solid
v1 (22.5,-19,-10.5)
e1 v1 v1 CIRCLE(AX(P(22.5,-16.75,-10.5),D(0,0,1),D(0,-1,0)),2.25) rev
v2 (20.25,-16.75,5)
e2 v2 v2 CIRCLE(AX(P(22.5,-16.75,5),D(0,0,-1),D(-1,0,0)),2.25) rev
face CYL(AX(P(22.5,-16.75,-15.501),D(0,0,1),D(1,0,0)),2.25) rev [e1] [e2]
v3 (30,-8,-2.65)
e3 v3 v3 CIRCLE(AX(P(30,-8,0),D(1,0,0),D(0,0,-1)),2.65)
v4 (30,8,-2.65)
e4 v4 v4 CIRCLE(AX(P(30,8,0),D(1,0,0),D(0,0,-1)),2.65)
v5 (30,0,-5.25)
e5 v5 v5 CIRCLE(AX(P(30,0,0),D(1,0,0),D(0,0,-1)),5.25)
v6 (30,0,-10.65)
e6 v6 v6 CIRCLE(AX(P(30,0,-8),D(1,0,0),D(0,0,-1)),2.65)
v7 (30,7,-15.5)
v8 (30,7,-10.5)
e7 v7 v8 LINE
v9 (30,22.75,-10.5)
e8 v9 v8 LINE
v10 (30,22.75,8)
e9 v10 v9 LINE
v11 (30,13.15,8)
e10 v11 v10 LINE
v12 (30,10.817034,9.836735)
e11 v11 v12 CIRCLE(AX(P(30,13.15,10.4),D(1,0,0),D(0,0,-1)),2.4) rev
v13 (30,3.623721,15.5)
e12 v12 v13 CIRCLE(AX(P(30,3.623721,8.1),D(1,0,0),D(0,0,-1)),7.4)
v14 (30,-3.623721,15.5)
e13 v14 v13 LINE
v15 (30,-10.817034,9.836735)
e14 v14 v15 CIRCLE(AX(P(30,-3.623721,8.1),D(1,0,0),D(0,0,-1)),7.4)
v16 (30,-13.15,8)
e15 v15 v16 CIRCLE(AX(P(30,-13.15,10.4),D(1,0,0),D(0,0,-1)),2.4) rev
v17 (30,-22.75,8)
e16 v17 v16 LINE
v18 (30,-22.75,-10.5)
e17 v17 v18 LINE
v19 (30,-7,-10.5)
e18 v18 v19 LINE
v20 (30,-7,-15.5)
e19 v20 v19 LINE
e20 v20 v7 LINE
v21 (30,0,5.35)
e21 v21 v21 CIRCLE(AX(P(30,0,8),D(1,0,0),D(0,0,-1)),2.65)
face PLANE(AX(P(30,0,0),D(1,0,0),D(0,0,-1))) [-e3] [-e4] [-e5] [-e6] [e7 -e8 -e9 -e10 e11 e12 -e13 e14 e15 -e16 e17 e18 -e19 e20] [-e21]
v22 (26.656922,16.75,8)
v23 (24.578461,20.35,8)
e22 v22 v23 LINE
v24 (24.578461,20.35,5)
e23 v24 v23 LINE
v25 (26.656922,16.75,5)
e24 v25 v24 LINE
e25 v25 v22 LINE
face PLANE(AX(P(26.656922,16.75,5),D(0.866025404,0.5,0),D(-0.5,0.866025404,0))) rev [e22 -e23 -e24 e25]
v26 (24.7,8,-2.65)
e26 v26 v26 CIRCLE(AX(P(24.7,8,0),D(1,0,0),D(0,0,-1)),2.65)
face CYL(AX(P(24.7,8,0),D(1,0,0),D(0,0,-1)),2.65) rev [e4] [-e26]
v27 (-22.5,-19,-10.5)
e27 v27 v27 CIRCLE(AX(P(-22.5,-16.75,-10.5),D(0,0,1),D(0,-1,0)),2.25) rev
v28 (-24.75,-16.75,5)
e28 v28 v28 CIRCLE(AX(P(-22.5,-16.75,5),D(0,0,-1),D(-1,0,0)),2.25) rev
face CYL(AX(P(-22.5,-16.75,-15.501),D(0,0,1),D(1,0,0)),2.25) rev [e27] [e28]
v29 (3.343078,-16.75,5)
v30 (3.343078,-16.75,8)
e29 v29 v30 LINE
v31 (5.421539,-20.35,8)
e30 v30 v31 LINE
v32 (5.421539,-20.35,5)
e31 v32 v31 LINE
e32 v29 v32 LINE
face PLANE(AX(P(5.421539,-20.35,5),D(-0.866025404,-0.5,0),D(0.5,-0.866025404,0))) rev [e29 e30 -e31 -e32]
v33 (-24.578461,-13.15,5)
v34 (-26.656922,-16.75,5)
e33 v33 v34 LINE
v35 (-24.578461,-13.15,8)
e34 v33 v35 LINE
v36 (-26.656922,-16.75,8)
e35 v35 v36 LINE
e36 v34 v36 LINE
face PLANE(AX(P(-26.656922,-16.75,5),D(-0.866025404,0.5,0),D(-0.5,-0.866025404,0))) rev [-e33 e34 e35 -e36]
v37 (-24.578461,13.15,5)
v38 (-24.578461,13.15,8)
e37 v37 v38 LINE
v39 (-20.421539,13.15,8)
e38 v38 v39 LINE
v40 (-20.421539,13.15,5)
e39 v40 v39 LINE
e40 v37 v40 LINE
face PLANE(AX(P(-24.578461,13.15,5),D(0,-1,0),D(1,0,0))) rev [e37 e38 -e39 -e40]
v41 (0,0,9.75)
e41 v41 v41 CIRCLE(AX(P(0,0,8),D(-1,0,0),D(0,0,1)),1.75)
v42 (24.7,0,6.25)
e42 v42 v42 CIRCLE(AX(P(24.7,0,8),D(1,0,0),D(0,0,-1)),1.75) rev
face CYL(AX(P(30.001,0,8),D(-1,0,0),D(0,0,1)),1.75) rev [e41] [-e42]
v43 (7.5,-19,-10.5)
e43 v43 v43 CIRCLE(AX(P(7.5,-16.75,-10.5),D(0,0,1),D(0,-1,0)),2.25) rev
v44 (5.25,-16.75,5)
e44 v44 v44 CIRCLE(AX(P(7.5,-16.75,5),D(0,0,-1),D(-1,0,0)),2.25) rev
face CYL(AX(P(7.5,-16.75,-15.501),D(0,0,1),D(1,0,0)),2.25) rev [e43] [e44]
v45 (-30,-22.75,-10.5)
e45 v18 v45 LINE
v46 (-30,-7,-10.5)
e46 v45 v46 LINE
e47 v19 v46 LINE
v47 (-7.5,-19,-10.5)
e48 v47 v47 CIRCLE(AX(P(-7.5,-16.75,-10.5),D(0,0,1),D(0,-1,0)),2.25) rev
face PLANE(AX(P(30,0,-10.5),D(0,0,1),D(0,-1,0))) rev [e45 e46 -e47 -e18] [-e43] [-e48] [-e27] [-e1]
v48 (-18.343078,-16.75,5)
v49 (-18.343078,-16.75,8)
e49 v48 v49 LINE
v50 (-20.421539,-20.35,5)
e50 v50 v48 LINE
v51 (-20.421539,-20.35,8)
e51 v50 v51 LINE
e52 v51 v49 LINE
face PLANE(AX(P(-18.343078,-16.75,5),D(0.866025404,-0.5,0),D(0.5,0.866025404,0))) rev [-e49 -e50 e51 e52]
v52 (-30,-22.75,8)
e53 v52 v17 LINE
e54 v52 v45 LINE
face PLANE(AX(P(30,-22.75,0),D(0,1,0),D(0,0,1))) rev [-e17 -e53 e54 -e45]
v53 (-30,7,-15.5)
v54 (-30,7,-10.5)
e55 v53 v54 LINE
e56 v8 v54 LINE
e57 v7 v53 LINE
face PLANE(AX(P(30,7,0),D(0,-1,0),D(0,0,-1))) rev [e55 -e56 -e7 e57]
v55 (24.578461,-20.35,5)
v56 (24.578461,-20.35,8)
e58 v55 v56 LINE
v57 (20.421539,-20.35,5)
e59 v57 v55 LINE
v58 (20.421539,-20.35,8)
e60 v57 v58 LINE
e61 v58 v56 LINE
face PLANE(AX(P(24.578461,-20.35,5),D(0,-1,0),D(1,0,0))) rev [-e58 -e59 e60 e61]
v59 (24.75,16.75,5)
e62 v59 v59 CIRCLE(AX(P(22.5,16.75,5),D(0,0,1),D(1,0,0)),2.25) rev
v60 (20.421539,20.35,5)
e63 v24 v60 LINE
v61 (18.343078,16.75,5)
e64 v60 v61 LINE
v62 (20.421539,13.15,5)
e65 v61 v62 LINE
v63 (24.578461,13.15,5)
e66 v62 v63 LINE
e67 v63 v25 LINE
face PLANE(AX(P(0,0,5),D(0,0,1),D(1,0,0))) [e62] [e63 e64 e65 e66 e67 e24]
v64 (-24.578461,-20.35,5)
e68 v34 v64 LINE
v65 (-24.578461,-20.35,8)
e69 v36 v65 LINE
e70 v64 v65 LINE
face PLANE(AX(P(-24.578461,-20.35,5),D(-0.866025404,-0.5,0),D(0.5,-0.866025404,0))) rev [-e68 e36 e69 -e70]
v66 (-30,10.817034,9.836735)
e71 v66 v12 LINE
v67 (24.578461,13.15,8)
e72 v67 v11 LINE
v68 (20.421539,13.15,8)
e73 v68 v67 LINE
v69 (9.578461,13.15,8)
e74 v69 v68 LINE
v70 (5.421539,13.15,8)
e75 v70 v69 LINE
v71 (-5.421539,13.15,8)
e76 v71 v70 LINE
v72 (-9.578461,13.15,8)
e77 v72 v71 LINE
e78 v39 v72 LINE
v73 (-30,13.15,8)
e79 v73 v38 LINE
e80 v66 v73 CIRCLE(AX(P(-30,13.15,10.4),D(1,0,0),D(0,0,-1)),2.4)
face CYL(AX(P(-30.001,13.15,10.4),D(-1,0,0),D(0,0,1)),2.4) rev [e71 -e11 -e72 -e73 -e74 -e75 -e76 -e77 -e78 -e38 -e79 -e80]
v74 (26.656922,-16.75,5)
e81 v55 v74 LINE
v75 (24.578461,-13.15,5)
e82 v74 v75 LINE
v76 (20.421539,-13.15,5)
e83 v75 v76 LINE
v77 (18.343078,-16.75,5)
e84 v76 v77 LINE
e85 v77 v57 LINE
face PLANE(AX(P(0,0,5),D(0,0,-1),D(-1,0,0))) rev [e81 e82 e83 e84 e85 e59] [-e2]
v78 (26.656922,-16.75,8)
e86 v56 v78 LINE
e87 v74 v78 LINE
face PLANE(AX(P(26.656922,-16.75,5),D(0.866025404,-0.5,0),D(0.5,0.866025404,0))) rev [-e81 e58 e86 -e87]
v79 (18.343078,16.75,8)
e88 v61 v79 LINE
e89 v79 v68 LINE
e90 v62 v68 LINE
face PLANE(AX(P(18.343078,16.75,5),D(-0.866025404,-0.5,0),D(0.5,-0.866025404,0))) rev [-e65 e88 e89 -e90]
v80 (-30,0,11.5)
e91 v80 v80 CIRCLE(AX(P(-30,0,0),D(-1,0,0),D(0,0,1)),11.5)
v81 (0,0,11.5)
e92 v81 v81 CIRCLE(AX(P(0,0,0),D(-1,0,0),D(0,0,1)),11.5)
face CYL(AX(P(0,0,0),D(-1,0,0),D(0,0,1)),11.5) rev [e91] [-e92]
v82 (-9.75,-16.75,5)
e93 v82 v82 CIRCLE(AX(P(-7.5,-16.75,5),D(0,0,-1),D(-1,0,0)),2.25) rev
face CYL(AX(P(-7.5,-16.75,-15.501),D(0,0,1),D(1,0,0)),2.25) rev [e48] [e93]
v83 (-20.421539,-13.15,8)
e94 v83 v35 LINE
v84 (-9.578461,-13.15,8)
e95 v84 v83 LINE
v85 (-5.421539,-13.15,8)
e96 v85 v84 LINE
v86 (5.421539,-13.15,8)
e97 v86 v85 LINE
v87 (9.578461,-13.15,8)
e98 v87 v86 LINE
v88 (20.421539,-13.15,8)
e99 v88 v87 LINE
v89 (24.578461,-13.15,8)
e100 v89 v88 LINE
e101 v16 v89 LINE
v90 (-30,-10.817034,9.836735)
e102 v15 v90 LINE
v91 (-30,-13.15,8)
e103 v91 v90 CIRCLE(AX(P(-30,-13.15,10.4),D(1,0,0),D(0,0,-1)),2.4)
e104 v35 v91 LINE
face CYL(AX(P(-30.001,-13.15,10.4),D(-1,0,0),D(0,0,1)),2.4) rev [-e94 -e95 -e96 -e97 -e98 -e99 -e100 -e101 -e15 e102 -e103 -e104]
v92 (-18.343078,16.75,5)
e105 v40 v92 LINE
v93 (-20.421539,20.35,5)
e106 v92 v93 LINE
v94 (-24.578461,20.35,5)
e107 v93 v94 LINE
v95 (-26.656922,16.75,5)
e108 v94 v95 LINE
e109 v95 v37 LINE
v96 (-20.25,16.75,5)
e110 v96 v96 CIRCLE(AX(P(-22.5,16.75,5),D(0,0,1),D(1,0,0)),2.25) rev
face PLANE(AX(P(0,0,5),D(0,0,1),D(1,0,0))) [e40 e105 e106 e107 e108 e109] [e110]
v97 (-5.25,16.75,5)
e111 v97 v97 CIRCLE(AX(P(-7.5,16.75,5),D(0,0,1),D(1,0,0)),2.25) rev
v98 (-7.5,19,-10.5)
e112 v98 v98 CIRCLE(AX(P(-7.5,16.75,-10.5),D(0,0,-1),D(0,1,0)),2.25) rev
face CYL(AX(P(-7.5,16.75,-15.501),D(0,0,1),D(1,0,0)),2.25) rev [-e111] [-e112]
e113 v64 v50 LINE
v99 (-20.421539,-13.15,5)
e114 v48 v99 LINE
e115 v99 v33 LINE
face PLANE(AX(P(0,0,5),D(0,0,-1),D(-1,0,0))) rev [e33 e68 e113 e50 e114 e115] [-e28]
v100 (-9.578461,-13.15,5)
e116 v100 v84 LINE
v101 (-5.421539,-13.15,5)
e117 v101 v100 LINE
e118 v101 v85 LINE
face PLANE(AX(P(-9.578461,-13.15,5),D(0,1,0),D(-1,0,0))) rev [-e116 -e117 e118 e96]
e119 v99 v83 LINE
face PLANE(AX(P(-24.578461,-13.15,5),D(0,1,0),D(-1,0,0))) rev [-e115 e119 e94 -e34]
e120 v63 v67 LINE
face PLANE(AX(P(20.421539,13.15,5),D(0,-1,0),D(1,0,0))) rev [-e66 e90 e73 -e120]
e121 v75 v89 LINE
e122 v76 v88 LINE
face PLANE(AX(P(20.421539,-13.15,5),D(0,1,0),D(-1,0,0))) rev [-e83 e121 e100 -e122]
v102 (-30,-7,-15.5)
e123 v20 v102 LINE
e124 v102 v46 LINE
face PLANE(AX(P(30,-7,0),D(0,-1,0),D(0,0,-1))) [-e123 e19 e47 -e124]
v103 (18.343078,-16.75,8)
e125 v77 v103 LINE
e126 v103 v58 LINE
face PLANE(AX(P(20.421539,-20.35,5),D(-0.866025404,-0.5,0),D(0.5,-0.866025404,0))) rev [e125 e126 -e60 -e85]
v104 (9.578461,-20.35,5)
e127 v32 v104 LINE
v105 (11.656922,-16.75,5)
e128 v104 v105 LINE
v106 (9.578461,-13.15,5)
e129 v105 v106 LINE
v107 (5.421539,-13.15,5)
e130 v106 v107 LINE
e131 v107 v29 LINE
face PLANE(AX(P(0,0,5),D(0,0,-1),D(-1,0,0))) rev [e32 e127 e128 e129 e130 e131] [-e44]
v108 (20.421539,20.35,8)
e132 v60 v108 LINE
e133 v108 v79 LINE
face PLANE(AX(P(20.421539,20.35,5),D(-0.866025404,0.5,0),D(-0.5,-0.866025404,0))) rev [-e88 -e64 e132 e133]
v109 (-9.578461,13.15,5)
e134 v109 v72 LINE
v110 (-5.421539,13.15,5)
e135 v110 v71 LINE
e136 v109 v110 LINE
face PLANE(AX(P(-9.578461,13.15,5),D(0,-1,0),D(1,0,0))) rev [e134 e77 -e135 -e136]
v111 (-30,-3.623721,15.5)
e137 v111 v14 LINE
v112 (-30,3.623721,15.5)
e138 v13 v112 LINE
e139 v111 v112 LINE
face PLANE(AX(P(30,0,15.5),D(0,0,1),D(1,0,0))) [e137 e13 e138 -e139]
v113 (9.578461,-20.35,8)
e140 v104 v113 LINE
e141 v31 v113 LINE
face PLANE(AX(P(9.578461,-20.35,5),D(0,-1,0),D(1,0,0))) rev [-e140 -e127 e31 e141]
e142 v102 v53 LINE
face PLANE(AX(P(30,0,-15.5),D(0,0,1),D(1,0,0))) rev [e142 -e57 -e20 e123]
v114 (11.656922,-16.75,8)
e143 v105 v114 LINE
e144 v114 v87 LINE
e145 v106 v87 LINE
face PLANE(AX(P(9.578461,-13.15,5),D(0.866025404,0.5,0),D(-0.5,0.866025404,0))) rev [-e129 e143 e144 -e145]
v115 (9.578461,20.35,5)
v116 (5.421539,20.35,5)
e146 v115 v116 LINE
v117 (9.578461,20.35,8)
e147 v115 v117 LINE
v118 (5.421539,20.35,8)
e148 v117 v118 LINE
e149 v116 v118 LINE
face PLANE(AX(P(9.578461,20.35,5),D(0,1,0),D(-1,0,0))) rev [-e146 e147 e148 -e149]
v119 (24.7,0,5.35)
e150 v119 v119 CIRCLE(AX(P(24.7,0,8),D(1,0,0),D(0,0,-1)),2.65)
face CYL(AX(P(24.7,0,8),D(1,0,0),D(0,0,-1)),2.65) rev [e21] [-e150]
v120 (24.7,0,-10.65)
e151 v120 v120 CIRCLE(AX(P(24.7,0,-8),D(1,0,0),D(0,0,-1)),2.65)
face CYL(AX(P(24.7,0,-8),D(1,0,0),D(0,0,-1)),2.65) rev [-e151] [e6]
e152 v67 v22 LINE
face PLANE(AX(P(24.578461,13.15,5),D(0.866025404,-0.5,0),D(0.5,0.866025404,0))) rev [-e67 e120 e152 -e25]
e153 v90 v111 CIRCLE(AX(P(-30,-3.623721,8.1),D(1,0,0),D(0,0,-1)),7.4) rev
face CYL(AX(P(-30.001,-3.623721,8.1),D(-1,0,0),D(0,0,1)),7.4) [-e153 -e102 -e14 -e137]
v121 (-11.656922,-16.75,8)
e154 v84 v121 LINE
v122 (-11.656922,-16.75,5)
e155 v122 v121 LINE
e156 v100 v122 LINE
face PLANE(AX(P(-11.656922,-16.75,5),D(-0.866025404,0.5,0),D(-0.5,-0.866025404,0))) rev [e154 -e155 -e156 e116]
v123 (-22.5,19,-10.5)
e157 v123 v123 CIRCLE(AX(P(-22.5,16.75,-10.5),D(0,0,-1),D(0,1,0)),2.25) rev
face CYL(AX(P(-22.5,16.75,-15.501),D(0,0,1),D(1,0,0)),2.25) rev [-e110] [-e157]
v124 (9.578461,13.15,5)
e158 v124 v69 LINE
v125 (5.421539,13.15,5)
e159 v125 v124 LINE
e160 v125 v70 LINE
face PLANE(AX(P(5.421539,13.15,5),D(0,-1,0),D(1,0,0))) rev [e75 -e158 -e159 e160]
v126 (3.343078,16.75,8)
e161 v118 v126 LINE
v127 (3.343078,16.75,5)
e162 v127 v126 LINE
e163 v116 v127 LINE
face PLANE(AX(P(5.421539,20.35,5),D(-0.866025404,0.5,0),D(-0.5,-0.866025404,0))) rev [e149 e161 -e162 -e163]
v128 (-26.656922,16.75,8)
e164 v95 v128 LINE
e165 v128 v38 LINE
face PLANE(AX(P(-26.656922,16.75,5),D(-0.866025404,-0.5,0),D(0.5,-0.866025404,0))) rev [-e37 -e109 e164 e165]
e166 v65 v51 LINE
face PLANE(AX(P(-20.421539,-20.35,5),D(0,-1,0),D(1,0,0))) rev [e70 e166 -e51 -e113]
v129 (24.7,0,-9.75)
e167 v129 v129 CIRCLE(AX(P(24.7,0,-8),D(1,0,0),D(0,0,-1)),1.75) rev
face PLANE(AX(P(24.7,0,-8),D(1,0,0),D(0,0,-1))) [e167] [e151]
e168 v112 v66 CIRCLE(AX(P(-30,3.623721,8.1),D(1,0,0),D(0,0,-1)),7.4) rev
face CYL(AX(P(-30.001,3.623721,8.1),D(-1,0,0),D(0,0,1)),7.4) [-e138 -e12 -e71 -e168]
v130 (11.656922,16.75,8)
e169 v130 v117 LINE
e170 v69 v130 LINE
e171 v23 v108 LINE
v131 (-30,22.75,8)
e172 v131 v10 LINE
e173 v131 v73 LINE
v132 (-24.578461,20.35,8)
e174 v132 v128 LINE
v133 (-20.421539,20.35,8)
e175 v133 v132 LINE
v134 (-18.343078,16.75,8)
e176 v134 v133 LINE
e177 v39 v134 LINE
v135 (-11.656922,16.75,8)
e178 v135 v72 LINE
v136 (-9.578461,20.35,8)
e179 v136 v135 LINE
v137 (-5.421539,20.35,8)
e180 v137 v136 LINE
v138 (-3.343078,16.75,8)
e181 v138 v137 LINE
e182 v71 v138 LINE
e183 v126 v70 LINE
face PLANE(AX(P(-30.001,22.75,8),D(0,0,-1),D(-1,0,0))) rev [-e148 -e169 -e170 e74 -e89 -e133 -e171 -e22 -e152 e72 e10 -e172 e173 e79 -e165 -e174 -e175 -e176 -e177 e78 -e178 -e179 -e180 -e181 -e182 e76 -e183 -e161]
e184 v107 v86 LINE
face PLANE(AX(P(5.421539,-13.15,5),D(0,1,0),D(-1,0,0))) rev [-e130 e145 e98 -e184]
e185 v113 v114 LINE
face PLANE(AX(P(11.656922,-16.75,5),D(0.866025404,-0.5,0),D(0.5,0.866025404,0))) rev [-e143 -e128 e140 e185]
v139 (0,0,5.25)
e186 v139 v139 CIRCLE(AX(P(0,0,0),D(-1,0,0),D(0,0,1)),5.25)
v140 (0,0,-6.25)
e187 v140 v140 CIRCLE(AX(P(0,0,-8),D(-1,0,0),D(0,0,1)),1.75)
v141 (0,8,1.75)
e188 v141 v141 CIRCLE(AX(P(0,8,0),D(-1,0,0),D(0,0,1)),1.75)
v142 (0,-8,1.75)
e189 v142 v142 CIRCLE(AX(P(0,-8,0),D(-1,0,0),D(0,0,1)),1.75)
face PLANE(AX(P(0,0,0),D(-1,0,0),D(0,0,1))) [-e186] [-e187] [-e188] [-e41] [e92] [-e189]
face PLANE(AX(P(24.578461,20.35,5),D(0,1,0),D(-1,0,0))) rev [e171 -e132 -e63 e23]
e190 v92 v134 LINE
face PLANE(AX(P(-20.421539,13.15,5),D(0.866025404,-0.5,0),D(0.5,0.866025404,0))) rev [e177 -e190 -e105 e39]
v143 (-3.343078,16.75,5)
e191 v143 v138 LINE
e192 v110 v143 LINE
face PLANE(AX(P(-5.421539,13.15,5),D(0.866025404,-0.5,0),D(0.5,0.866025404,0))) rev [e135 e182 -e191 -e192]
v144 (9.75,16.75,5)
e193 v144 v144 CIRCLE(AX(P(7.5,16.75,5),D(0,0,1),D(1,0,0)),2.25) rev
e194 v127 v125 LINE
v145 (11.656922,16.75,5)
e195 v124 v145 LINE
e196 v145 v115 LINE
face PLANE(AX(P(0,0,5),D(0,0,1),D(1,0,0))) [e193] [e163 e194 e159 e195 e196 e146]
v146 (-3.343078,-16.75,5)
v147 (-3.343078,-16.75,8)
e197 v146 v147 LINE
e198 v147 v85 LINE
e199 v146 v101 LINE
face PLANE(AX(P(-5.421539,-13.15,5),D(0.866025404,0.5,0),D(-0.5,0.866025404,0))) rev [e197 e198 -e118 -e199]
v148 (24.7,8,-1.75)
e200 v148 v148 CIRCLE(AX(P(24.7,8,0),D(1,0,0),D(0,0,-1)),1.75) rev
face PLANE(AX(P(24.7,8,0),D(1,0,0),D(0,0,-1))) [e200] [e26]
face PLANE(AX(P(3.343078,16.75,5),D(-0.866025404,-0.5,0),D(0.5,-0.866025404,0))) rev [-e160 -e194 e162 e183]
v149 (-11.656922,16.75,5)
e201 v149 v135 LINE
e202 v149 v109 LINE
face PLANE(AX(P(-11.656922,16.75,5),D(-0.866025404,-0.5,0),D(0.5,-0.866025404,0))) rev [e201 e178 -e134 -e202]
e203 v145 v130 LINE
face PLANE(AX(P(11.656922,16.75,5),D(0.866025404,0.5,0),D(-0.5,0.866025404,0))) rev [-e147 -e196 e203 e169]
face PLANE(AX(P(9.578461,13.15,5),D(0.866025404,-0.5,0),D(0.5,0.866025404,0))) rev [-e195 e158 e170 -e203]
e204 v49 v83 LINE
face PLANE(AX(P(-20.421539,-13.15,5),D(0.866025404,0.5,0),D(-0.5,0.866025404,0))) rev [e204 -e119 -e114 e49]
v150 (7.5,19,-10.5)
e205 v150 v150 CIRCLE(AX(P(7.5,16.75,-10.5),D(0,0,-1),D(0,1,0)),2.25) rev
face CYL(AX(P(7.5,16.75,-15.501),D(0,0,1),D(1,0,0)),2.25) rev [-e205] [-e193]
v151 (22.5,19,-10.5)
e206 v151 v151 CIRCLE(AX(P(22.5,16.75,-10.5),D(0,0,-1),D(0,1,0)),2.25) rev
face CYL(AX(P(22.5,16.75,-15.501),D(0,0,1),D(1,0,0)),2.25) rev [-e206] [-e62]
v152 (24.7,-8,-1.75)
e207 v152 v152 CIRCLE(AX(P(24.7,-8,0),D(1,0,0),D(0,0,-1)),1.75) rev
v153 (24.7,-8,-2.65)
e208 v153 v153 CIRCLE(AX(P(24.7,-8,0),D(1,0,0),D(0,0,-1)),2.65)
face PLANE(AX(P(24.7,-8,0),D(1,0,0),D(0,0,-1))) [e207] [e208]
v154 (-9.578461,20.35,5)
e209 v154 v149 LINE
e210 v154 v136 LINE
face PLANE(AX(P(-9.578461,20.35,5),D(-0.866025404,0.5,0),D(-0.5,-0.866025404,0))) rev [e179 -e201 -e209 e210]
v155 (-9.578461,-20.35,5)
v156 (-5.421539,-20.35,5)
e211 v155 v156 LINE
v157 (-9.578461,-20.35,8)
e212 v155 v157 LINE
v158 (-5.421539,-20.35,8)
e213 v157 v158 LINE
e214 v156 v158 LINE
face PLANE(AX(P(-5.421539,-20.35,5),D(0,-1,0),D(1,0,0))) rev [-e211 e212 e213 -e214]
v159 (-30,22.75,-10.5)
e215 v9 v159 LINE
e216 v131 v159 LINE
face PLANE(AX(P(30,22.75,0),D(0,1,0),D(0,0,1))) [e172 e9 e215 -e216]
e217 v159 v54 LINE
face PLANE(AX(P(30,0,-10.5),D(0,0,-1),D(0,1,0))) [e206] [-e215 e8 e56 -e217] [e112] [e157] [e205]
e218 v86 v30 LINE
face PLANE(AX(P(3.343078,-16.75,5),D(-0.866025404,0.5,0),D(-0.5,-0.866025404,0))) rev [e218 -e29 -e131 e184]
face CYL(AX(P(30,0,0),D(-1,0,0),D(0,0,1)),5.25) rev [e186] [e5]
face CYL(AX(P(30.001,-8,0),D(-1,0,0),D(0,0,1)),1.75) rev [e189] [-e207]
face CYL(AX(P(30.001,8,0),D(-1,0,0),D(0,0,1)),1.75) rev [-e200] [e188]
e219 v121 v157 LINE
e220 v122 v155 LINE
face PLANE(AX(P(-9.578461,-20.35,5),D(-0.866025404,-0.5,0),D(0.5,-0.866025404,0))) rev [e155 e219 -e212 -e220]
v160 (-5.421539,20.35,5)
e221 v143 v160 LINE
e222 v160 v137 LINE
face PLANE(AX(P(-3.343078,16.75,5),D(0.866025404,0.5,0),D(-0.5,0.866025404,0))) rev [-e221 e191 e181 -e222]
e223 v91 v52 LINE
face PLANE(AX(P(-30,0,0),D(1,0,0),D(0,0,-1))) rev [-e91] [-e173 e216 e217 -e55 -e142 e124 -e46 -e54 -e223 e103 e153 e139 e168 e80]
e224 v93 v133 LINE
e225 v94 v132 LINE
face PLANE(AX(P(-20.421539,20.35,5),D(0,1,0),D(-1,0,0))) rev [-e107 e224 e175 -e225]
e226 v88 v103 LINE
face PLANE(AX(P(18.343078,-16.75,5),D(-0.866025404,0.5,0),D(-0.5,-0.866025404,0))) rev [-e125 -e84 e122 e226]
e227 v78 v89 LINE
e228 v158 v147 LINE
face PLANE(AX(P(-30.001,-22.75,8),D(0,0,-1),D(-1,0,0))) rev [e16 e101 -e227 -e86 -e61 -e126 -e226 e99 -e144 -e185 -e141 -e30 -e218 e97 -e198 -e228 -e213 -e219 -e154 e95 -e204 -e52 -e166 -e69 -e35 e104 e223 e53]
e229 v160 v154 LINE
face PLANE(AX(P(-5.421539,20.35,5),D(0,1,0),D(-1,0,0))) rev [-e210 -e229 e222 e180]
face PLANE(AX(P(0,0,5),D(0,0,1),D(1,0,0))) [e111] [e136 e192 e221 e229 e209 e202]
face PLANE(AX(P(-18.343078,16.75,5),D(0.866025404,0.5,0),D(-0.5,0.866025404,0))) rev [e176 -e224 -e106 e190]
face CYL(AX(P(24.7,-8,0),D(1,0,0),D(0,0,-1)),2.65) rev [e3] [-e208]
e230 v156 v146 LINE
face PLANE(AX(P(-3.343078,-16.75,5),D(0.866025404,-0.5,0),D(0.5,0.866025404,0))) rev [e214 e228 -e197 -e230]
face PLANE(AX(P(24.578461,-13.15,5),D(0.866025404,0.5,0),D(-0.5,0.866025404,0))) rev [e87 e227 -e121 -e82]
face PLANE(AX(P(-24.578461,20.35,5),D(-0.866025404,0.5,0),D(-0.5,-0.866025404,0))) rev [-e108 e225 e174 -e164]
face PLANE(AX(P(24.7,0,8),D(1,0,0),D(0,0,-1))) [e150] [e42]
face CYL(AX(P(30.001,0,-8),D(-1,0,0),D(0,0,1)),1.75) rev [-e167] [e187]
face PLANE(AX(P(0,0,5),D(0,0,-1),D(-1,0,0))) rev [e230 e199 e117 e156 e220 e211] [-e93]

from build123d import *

# Parameters (mm, degrees)
SKETCH2_R           = 5.25
BOSS_EXTRUDE1_DEPTH = 30
SKETCH4_R           = 11.5
CUT_EXTRUDE1_DEPTH  = 30
CUT_EXTRUDE2_REACH  = 42.716
SKETCH5_R           = 1.75
SKETCH6_R           = 2.65
CUT_EXTRUDE3_DEPTH  = 5.3
CUT_EXTRUDE4_REACH  = 50.771
SKETCH8_R           = 2.25
CUT_EXTRUDE6_REACH  = 68.014
SKETCH10_W          = 7.5
SKETCH10_H          = 12
CUT_EXTRUDE5_DEPTH  = 3
FILLET2_R           = 2.4
FILLET3_R           = 7.4


with BuildPart() as part:
    # Sketch2 → Boss-Extrude1 (new, symmetric)
    with BuildSketch(Plane(origin=(0, 0, 0), x_dir=(0, 0, -1), z_dir=(1, 0, 0))):
        Polygon((-15.5, 22.75), (-15.5, -22.75), (10.5, -22.75), (10.5, -7), (15.5, -7), (15.5, 7), (10.5, 7), (10.5, 22.75), align=None)
        Circle(SKETCH2_R, mode=Mode.SUBTRACT)
    extrude(amount=BOSS_EXTRUDE1_DEPTH, both=True)

    # Sketch4 → Cut-Extrude1 (cut)
    with BuildSketch(Plane.ZY.offset(30)):
        Circle(SKETCH4_R)
    extrude(amount=-CUT_EXTRUDE1_DEPTH, mode=Mode.SUBTRACT)

    # Sketch5 → Cut-Extrude2 (cut, up to next)
    with BuildSketch(Plane.ZY, mode=Mode.PRIVATE) as cut_extrude2_sk1:
        with Locations((0, 8)):
            Circle(SKETCH5_R)
    cut_extrude2_tool1 = extrude(cut_extrude2_sk1.sketch, amount=-CUT_EXTRUDE2_REACH, mode=Mode.PRIVATE) & part.part
    # Sketch5 → Cut-Extrude2 (cut, up to next)
    with BuildSketch(Plane.ZY, mode=Mode.PRIVATE) as cut_extrude2_sk2:
        with Locations((8, 0)):
            Circle(SKETCH5_R)
    cut_extrude2_tool2 = extrude(cut_extrude2_sk2.sketch, amount=-CUT_EXTRUDE2_REACH, mode=Mode.PRIVATE) & part.part
    # Sketch5 → Cut-Extrude2 (cut, up to next)
    with BuildSketch(Plane.ZY, mode=Mode.PRIVATE) as cut_extrude2_sk3:
        with Locations((0, -8)):
            Circle(SKETCH5_R)
    cut_extrude2_tool3 = extrude(cut_extrude2_sk3.sketch, amount=-CUT_EXTRUDE2_REACH, mode=Mode.PRIVATE) & part.part
    # Sketch5 → Cut-Extrude2 (cut, up to next)
    with BuildSketch(Plane.ZY, mode=Mode.PRIVATE) as cut_extrude2_sk4:
        with Locations((-8, 0)):
            Circle(SKETCH5_R)
    cut_extrude2_tool4 = extrude(cut_extrude2_sk4.sketch, amount=-CUT_EXTRUDE2_REACH, mode=Mode.PRIVATE) & part.part
    add(cut_extrude2_tool1.solids().sort_by_distance((0, 8, 0))[0], mode=Mode.SUBTRACT)
    add(cut_extrude2_tool2.solids().sort_by_distance((0, 0, 8))[0], mode=Mode.SUBTRACT)
    add(cut_extrude2_tool3.solids().sort_by_distance((0, -8, 0))[0], mode=Mode.SUBTRACT)
    add(cut_extrude2_tool4.solids().sort_by_distance((0, 0, -8))[0], mode=Mode.SUBTRACT)

    # Sketch6 → Cut-Extrude3 (cut)
    with BuildSketch(Plane(origin=(30, 0, 0), x_dir=(0, 0, -1), z_dir=(1, 0, 0))):
        with Locations((0, 8)):
            Circle(SKETCH6_R)
        with Locations((8, 0)):
            Circle(SKETCH6_R)
        with Locations((0, -8)):
            Circle(SKETCH6_R)
        with Locations((-8, 0)):
            Circle(SKETCH6_R)
    extrude(amount=-CUT_EXTRUDE3_DEPTH, mode=Mode.SUBTRACT)

    # Sketch8 → Cut-Extrude4 (cut, up to next)
    with BuildSketch(Plane.XY.offset(15.5), mode=Mode.PRIVATE) as cut_extrude4_sk1:
        with Locations((-22.5, 16.75)):
            Circle(SKETCH8_R)
    cut_extrude4_tool1 = extrude(cut_extrude4_sk1.sketch, amount=-CUT_EXTRUDE4_REACH, mode=Mode.PRIVATE) & part.part
    # Sketch8 → Cut-Extrude4 (cut, up to next)
    with BuildSketch(Plane.XY.offset(15.5), mode=Mode.PRIVATE) as cut_extrude4_sk2:
        with Locations((-7.5, 16.75)):
            Circle(SKETCH8_R)
    cut_extrude4_tool2 = extrude(cut_extrude4_sk2.sketch, amount=-CUT_EXTRUDE4_REACH, mode=Mode.PRIVATE) & part.part
    # Sketch8 → Cut-Extrude4 (cut, up to next)
    with BuildSketch(Plane.XY.offset(15.5), mode=Mode.PRIVATE) as cut_extrude4_sk3:
        with Locations((7.5, 16.75)):
            Circle(SKETCH8_R)
    cut_extrude4_tool3 = extrude(cut_extrude4_sk3.sketch, amount=-CUT_EXTRUDE4_REACH, mode=Mode.PRIVATE) & part.part
    # Sketch8 → Cut-Extrude4 (cut, up to next)
    with BuildSketch(Plane.XY.offset(15.5), mode=Mode.PRIVATE) as cut_extrude4_sk4:
        with Locations((22.5, 16.75)):
            Circle(SKETCH8_R)
    cut_extrude4_tool4 = extrude(cut_extrude4_sk4.sketch, amount=-CUT_EXTRUDE4_REACH, mode=Mode.PRIVATE) & part.part
    # Sketch8 → Cut-Extrude4 (cut, up to next)
    with BuildSketch(Plane.XY.offset(15.5), mode=Mode.PRIVATE) as cut_extrude4_sk5:
        with Locations(Location((22.5, -16.75, 0), (0, 0, 270))):
            Circle(SKETCH8_R)
    cut_extrude4_tool5 = extrude(cut_extrude4_sk5.sketch, amount=-CUT_EXTRUDE4_REACH, mode=Mode.PRIVATE) & part.part
    # Sketch8 → Cut-Extrude4 (cut, up to next)
    with BuildSketch(Plane.XY.offset(15.5), mode=Mode.PRIVATE) as cut_extrude4_sk6:
        with Locations(Location((7.5, -16.75, 0), (0, 0, 270))):
            Circle(SKETCH8_R)
    cut_extrude4_tool6 = extrude(cut_extrude4_sk6.sketch, amount=-CUT_EXTRUDE4_REACH, mode=Mode.PRIVATE) & part.part
    # Sketch8 → Cut-Extrude4 (cut, up to next)
    with BuildSketch(Plane.XY.offset(15.5), mode=Mode.PRIVATE) as cut_extrude4_sk7:
        with Locations(Location((-7.5, -16.75, 0), (0, 0, 270))):
            Circle(SKETCH8_R)
    cut_extrude4_tool7 = extrude(cut_extrude4_sk7.sketch, amount=-CUT_EXTRUDE4_REACH, mode=Mode.PRIVATE) & part.part
    # Sketch8 → Cut-Extrude4 (cut, up to next)
    with BuildSketch(Plane.XY.offset(15.5), mode=Mode.PRIVATE) as cut_extrude4_sk8:
        with Locations(Location((-22.5, -16.75, 0), (0, 0, 270))):
            Circle(SKETCH8_R)
    cut_extrude4_tool8 = extrude(cut_extrude4_sk8.sketch, amount=-CUT_EXTRUDE4_REACH, mode=Mode.PRIVATE) & part.part
    add(cut_extrude4_tool1.solids().sort_by_distance((-22.5, 16.75, 15.5))[0], mode=Mode.SUBTRACT)
    add(cut_extrude4_tool2.solids().sort_by_distance((-7.5, 16.75, 15.5))[0], mode=Mode.SUBTRACT)
    add(cut_extrude4_tool3.solids().sort_by_distance((7.5, 16.75, 15.5))[0], mode=Mode.SUBTRACT)
    add(cut_extrude4_tool4.solids().sort_by_distance((22.5, 16.75, 15.5))[0], mode=Mode.SUBTRACT)
    add(cut_extrude4_tool5.solids().sort_by_distance((22.5, -16.75, 15.5))[0], mode=Mode.SUBTRACT)
    add(cut_extrude4_tool6.solids().sort_by_distance((7.5, -16.75, 15.5))[0], mode=Mode.SUBTRACT)
    add(cut_extrude4_tool7.solids().sort_by_distance((-7.5, -16.75, 15.5))[0], mode=Mode.SUBTRACT)
    add(cut_extrude4_tool8.solids().sort_by_distance((-22.5, -16.75, 15.5))[0], mode=Mode.SUBTRACT)

    # Sketch10 → Cut-Extrude6 (cut, up to next)
    with BuildSketch(Plane(origin=(30, 0, 0), x_dir=(0, 0, -1), z_dir=(1, 0, 0)), mode=Mode.PRIVATE) as cut_extrude6_sk1:
        with Locations((-11.75, 16.75)):
            Rectangle(SKETCH10_W, SKETCH10_H)
    cut_extrude6_tool1 = extrude(cut_extrude6_sk1.sketch, amount=-CUT_EXTRUDE6_REACH, mode=Mode.PRIVATE) & part.part
    # Sketch10 → Cut-Extrude6 (cut, up to next)
    with BuildSketch(Plane(origin=(30, 0, 0), x_dir=(0, 0, -1), z_dir=(1, 0, 0)), mode=Mode.PRIVATE) as cut_extrude6_sk2:
        with Locations((-11.75, -16.75)):
            Rectangle(SKETCH10_W, SKETCH10_H)
    cut_extrude6_tool2 = extrude(cut_extrude6_sk2.sketch, amount=-CUT_EXTRUDE6_REACH, mode=Mode.PRIVATE) & part.part
    add(cut_extrude6_tool1.solids().sort_by_distance((30, 16.75, 11.75))[0], mode=Mode.SUBTRACT)
    add(cut_extrude6_tool2.solids().sort_by_distance((30, -16.75, 11.75))[0], mode=Mode.SUBTRACT)

    # Sketch9 → Cut-Extrude5 (cut)
    with BuildSketch(Plane.XY.offset(8)):
        Polygon((-3.343078062, 16.75), (-5.421539031, 20.35), (-9.578460969, 20.35), (-11.656921938, 16.75), (-9.578460969, 13.15), (-5.421539031, 13.15), align=None)
        Polygon((-18.343078062, 16.75), (-20.421539031, 20.35), (-24.578460969, 20.35), (-26.656921938, 16.75), (-24.578460969, 13.15), (-20.421539031, 13.15), align=None)
        Polygon((11.656921938, 16.75), (9.578460969, 20.35), (5.421539031, 20.35), (3.343078062, 16.75), (5.421539031, 13.15), (9.578460969, 13.15), align=None)
        Polygon((26.656921938, 16.75), (24.578460969, 20.35), (20.421539031, 20.35), (18.343078062, 16.75), (20.421539031, 13.15), (24.578460969, 13.15), align=None)
        Polygon((24.578460969, -13.15), (26.656921938, -16.75), (24.578460969, -20.35), (20.421539031, -20.35), (18.343078062, -16.75), (20.421539031, -13.15), align=None)
        Polygon((9.578460969, -13.15), (11.656921938, -16.75), (9.578460969, -20.35), (5.421539031, -20.35), (3.343078062, -16.75), (5.421539031, -13.15), align=None)
        Polygon((-5.421539031, -13.15), (-3.343078062, -16.75), (-5.421539031, -20.35), (-9.578460969, -20.35), (-11.656921938, -16.75), (-9.578460969, -13.15), align=None)
        Polygon((-20.421539031, -13.15), (-18.343078062, -16.75), (-20.421539031, -20.35), (-24.578460969, -20.35), (-26.656921938, -16.75), (-24.578460969, -13.15), align=None)
    extrude(amount=-CUT_EXTRUDE5_DEPTH, mode=Mode.SUBTRACT)

    # Fillet2
    fillet2_edges = [part.edges().sort_by_distance(p)[0] for p in [
        (0, 10.75, 8),
        (0, -10.75, 8),
    ]]
    fillet(fillet2_edges, radius=FILLET2_R - 0.0001)  # a hair under: the kernel refuses the full size

    # Fillet3
    fillet3_edges = [part.edges().sort_by_distance(p)[0] for p in [
        (0, -10.75, 15.5),
        (0, 10.75, 15.5),
    ]]
    fillet(fillet3_edges, radius=FILLET3_R)


solid = part.part
